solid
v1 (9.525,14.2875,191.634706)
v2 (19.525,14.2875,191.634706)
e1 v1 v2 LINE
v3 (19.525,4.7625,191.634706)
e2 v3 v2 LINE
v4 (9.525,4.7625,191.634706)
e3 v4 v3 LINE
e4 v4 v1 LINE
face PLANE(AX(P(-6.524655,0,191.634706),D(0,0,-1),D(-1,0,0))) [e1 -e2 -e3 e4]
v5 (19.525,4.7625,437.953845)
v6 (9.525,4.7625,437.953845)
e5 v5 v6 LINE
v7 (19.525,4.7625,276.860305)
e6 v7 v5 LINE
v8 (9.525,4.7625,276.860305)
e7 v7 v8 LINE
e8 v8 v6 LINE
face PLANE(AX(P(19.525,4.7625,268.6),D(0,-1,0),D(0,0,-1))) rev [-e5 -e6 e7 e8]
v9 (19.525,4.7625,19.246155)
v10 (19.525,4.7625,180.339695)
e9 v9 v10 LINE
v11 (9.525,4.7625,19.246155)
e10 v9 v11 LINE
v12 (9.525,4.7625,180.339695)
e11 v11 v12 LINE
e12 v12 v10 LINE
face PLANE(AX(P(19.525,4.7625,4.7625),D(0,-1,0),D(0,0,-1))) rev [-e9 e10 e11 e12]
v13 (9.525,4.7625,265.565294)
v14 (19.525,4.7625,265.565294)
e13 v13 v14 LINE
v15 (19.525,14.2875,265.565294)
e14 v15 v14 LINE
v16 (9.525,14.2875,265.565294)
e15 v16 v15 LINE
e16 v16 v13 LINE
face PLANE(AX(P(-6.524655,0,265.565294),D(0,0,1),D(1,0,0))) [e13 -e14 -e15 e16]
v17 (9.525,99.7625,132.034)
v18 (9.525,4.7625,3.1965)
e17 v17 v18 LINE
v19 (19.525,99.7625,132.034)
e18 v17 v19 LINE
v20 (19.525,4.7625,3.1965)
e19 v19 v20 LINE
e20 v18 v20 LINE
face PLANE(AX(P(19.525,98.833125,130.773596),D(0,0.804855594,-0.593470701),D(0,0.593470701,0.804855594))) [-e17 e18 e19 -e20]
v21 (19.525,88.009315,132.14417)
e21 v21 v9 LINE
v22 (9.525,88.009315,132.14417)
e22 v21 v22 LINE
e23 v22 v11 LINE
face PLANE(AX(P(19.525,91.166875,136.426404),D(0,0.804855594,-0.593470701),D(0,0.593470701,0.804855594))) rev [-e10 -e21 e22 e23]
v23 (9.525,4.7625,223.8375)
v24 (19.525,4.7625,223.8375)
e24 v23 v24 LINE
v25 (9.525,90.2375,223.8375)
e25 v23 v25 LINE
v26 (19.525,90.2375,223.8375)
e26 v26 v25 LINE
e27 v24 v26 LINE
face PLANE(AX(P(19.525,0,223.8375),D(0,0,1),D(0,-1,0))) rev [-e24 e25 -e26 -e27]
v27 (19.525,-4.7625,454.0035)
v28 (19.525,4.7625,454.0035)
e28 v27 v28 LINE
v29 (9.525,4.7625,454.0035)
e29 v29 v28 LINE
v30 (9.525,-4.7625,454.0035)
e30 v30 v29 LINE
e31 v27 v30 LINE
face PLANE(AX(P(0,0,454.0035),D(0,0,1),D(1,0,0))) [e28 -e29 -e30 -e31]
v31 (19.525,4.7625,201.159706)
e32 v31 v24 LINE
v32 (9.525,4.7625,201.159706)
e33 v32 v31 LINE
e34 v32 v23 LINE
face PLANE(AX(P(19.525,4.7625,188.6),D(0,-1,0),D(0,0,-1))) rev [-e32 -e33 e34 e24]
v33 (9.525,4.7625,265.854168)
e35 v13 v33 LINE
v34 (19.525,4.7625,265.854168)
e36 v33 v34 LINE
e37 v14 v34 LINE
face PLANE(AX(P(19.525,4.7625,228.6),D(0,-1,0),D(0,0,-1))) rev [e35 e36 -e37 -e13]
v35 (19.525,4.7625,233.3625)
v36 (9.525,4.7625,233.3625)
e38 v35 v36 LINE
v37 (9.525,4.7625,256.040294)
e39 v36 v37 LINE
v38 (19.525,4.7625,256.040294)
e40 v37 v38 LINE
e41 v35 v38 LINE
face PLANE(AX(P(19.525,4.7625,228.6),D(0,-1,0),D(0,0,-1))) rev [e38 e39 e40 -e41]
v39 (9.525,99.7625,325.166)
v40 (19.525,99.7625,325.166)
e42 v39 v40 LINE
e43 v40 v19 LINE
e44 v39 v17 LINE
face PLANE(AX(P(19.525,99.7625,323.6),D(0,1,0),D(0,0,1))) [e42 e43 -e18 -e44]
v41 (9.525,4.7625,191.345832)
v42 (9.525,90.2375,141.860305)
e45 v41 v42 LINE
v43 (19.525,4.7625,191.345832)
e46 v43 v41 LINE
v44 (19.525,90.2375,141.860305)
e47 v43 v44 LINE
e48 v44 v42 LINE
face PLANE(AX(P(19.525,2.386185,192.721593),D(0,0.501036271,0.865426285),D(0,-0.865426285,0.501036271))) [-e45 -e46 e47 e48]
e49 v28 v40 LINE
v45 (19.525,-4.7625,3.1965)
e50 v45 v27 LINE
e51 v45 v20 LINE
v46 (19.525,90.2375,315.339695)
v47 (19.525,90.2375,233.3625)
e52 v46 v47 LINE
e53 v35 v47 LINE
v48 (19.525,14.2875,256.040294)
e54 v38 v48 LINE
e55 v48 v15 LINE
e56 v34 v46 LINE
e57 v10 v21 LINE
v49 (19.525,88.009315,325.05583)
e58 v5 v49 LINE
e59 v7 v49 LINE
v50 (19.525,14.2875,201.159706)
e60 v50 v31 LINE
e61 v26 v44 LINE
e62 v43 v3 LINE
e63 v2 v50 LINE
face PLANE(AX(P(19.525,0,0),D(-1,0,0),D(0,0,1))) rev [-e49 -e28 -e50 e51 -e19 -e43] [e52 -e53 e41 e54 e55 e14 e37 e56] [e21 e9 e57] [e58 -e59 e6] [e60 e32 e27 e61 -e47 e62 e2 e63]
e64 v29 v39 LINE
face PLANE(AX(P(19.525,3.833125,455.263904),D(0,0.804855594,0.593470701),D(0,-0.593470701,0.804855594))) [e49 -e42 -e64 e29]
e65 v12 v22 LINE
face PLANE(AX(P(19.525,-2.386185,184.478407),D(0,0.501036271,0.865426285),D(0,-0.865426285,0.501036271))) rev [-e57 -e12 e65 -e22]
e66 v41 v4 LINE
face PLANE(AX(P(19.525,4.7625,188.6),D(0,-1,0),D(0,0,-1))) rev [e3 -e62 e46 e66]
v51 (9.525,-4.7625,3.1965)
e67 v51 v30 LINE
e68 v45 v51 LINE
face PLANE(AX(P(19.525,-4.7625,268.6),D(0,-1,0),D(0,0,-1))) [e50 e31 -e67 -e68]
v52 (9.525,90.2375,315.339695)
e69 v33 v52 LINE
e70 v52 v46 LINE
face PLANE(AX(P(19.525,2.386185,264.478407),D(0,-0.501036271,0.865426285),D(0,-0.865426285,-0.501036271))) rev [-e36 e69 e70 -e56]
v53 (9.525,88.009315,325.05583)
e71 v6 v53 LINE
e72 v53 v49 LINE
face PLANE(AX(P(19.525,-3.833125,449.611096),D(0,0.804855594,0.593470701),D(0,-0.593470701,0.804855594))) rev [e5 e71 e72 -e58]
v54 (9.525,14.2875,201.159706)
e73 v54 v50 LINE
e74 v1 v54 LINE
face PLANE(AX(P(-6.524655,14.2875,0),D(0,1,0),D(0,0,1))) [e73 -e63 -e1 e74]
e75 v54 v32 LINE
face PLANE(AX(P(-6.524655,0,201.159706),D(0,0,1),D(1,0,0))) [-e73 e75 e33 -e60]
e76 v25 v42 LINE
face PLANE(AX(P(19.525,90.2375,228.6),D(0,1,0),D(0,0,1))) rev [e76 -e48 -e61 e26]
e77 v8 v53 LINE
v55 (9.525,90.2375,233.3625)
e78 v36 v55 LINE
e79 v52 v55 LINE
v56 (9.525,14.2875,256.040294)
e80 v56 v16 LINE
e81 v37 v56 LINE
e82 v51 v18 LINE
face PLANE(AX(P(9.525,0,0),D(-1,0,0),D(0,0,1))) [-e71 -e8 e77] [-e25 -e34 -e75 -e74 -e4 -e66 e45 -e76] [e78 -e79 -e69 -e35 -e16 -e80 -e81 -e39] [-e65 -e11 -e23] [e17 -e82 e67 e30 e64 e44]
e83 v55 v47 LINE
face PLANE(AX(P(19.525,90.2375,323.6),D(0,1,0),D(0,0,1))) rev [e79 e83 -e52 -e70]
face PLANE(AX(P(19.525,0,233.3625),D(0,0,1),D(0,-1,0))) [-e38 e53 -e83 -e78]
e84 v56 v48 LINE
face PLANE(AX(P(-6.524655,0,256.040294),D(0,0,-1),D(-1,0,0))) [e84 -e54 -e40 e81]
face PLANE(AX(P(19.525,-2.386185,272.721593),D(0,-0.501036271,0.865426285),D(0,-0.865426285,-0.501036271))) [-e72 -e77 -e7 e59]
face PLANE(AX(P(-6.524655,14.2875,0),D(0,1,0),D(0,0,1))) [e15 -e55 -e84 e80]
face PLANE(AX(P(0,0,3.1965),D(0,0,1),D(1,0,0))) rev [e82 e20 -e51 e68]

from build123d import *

# Parameters (mm, degrees)
EXTRUDE_THIN1_DEPTH = 10
SKETCH3_W           = 9.525
SKETCH3_H           = 9.525
BOSS_EXTRUDE1_DEPTH = 10
SKETCH4_W           = 25.457542158
SKETCH4_H           = 16.944951572
CUT_EXTRUDE1_DEPTH  = 12.917655
SKETCH5_W           = 71.291664715
SKETCH5_H           = 18.17592298
CUT_EXTRUDE2_DEPTH  = 12.917655


# Read off the part's stored shape, not the designer's step: Extrude-Thin1
with BuildPart() as part:
    # Extrude-Thin1 outline → Extrude-Thin1 (new body)
    with BuildSketch(Plane(origin=(9.525, 0, 0), x_dir=(0, 0, -1), z_dir=(1, 0, 0))):
        Polygon((-323.6, 99.7625), (-323.6, 95), (-326.426404213, 98.833124766), (-466.921154801, -4.7625), (9.721154801, -4.7625), (-130.773595787, 98.833124766), (-133.6, 95), (-133.6, 99.7625), align=None)
        Polygon((-276.860305191, 4.7625), (-437.953845199, 4.7625), (-325.055829502, 88.009314718), align=None, mode=Mode.SUBTRACT)
        Polygon((-180.339694809, 4.7625), (-132.144170498, 88.009314718), (-19.246154801, 4.7625), align=None, mode=Mode.SUBTRACT)
        Polygon((-315.339694809, 90.2375), (-233.3625, 90.2375), (-233.3625, 4.7625), (-265.854168493, 4.7625), align=None, mode=Mode.SUBTRACT)
        Polygon((-223.8375, 90.2375), (-141.860305191, 90.2375), (-191.345831507, 4.7625), (-223.8375, 4.7625), align=None, mode=Mode.SUBTRACT)
    extrude(amount=EXTRUDE_THIN1_DEPTH)

    # Sketch3 → Boss-Extrude1 (add)
    with BuildSketch(Plane(origin=(19.525, 0, 0), x_dir=(0, 0, -1), z_dir=(1, 0, 0))):
        Polygon((-133.6, 99.7625), (-133.6, 95), (-130.773595787, 98.833124766), (-132.033999804, 99.7625), align=None)
        Polygon((-326.426404213, 98.833124766), (-323.6, 95), (-323.6, 99.7625), (-325.166000196, 99.7625), align=None)
        Polygon((9.721154801, 4.7625), (-3.196499804, 4.7625), (9.721154801, -4.7625), align=None)
        Polygon((-466.921154801, -4.7625), (-454.003500196, 4.7625), (-466.921154801, 4.7625), align=None)
        with Locations((-260.802793514, 9.525)):
            Rectangle(SKETCH3_W, SKETCH3_H)
        with Locations((-196.397206486, 9.525)):
            Rectangle(SKETCH3_W, SKETCH3_H)
    extrude(amount=-BOSS_EXTRUDE1_DEPTH)

    # Sketch4 → Cut-Extrude1 (cut)
    with BuildSketch(Plane(origin=(0, 0, -9.721154801), x_dir=(-1, 0, 0), z_dir=(0, 0, -1))):
        with Locations((-19.165581616, -1.578540654)):
            Rectangle(SKETCH4_W, SKETCH4_H)
    extrude(amount=-CUT_EXTRUDE1_DEPTH, mode=Mode.SUBTRACT)

    # Sketch5 → Cut-Extrude2 (cut)
    with BuildSketch(Plane.XY.offset(466.921154801)):
        with Locations((18.052286902, -0.452774422)):
            Rectangle(SKETCH5_W, SKETCH5_H)
    extrude(amount=-CUT_EXTRUDE2_DEPTH, mode=Mode.SUBTRACT)


solid = part.part
